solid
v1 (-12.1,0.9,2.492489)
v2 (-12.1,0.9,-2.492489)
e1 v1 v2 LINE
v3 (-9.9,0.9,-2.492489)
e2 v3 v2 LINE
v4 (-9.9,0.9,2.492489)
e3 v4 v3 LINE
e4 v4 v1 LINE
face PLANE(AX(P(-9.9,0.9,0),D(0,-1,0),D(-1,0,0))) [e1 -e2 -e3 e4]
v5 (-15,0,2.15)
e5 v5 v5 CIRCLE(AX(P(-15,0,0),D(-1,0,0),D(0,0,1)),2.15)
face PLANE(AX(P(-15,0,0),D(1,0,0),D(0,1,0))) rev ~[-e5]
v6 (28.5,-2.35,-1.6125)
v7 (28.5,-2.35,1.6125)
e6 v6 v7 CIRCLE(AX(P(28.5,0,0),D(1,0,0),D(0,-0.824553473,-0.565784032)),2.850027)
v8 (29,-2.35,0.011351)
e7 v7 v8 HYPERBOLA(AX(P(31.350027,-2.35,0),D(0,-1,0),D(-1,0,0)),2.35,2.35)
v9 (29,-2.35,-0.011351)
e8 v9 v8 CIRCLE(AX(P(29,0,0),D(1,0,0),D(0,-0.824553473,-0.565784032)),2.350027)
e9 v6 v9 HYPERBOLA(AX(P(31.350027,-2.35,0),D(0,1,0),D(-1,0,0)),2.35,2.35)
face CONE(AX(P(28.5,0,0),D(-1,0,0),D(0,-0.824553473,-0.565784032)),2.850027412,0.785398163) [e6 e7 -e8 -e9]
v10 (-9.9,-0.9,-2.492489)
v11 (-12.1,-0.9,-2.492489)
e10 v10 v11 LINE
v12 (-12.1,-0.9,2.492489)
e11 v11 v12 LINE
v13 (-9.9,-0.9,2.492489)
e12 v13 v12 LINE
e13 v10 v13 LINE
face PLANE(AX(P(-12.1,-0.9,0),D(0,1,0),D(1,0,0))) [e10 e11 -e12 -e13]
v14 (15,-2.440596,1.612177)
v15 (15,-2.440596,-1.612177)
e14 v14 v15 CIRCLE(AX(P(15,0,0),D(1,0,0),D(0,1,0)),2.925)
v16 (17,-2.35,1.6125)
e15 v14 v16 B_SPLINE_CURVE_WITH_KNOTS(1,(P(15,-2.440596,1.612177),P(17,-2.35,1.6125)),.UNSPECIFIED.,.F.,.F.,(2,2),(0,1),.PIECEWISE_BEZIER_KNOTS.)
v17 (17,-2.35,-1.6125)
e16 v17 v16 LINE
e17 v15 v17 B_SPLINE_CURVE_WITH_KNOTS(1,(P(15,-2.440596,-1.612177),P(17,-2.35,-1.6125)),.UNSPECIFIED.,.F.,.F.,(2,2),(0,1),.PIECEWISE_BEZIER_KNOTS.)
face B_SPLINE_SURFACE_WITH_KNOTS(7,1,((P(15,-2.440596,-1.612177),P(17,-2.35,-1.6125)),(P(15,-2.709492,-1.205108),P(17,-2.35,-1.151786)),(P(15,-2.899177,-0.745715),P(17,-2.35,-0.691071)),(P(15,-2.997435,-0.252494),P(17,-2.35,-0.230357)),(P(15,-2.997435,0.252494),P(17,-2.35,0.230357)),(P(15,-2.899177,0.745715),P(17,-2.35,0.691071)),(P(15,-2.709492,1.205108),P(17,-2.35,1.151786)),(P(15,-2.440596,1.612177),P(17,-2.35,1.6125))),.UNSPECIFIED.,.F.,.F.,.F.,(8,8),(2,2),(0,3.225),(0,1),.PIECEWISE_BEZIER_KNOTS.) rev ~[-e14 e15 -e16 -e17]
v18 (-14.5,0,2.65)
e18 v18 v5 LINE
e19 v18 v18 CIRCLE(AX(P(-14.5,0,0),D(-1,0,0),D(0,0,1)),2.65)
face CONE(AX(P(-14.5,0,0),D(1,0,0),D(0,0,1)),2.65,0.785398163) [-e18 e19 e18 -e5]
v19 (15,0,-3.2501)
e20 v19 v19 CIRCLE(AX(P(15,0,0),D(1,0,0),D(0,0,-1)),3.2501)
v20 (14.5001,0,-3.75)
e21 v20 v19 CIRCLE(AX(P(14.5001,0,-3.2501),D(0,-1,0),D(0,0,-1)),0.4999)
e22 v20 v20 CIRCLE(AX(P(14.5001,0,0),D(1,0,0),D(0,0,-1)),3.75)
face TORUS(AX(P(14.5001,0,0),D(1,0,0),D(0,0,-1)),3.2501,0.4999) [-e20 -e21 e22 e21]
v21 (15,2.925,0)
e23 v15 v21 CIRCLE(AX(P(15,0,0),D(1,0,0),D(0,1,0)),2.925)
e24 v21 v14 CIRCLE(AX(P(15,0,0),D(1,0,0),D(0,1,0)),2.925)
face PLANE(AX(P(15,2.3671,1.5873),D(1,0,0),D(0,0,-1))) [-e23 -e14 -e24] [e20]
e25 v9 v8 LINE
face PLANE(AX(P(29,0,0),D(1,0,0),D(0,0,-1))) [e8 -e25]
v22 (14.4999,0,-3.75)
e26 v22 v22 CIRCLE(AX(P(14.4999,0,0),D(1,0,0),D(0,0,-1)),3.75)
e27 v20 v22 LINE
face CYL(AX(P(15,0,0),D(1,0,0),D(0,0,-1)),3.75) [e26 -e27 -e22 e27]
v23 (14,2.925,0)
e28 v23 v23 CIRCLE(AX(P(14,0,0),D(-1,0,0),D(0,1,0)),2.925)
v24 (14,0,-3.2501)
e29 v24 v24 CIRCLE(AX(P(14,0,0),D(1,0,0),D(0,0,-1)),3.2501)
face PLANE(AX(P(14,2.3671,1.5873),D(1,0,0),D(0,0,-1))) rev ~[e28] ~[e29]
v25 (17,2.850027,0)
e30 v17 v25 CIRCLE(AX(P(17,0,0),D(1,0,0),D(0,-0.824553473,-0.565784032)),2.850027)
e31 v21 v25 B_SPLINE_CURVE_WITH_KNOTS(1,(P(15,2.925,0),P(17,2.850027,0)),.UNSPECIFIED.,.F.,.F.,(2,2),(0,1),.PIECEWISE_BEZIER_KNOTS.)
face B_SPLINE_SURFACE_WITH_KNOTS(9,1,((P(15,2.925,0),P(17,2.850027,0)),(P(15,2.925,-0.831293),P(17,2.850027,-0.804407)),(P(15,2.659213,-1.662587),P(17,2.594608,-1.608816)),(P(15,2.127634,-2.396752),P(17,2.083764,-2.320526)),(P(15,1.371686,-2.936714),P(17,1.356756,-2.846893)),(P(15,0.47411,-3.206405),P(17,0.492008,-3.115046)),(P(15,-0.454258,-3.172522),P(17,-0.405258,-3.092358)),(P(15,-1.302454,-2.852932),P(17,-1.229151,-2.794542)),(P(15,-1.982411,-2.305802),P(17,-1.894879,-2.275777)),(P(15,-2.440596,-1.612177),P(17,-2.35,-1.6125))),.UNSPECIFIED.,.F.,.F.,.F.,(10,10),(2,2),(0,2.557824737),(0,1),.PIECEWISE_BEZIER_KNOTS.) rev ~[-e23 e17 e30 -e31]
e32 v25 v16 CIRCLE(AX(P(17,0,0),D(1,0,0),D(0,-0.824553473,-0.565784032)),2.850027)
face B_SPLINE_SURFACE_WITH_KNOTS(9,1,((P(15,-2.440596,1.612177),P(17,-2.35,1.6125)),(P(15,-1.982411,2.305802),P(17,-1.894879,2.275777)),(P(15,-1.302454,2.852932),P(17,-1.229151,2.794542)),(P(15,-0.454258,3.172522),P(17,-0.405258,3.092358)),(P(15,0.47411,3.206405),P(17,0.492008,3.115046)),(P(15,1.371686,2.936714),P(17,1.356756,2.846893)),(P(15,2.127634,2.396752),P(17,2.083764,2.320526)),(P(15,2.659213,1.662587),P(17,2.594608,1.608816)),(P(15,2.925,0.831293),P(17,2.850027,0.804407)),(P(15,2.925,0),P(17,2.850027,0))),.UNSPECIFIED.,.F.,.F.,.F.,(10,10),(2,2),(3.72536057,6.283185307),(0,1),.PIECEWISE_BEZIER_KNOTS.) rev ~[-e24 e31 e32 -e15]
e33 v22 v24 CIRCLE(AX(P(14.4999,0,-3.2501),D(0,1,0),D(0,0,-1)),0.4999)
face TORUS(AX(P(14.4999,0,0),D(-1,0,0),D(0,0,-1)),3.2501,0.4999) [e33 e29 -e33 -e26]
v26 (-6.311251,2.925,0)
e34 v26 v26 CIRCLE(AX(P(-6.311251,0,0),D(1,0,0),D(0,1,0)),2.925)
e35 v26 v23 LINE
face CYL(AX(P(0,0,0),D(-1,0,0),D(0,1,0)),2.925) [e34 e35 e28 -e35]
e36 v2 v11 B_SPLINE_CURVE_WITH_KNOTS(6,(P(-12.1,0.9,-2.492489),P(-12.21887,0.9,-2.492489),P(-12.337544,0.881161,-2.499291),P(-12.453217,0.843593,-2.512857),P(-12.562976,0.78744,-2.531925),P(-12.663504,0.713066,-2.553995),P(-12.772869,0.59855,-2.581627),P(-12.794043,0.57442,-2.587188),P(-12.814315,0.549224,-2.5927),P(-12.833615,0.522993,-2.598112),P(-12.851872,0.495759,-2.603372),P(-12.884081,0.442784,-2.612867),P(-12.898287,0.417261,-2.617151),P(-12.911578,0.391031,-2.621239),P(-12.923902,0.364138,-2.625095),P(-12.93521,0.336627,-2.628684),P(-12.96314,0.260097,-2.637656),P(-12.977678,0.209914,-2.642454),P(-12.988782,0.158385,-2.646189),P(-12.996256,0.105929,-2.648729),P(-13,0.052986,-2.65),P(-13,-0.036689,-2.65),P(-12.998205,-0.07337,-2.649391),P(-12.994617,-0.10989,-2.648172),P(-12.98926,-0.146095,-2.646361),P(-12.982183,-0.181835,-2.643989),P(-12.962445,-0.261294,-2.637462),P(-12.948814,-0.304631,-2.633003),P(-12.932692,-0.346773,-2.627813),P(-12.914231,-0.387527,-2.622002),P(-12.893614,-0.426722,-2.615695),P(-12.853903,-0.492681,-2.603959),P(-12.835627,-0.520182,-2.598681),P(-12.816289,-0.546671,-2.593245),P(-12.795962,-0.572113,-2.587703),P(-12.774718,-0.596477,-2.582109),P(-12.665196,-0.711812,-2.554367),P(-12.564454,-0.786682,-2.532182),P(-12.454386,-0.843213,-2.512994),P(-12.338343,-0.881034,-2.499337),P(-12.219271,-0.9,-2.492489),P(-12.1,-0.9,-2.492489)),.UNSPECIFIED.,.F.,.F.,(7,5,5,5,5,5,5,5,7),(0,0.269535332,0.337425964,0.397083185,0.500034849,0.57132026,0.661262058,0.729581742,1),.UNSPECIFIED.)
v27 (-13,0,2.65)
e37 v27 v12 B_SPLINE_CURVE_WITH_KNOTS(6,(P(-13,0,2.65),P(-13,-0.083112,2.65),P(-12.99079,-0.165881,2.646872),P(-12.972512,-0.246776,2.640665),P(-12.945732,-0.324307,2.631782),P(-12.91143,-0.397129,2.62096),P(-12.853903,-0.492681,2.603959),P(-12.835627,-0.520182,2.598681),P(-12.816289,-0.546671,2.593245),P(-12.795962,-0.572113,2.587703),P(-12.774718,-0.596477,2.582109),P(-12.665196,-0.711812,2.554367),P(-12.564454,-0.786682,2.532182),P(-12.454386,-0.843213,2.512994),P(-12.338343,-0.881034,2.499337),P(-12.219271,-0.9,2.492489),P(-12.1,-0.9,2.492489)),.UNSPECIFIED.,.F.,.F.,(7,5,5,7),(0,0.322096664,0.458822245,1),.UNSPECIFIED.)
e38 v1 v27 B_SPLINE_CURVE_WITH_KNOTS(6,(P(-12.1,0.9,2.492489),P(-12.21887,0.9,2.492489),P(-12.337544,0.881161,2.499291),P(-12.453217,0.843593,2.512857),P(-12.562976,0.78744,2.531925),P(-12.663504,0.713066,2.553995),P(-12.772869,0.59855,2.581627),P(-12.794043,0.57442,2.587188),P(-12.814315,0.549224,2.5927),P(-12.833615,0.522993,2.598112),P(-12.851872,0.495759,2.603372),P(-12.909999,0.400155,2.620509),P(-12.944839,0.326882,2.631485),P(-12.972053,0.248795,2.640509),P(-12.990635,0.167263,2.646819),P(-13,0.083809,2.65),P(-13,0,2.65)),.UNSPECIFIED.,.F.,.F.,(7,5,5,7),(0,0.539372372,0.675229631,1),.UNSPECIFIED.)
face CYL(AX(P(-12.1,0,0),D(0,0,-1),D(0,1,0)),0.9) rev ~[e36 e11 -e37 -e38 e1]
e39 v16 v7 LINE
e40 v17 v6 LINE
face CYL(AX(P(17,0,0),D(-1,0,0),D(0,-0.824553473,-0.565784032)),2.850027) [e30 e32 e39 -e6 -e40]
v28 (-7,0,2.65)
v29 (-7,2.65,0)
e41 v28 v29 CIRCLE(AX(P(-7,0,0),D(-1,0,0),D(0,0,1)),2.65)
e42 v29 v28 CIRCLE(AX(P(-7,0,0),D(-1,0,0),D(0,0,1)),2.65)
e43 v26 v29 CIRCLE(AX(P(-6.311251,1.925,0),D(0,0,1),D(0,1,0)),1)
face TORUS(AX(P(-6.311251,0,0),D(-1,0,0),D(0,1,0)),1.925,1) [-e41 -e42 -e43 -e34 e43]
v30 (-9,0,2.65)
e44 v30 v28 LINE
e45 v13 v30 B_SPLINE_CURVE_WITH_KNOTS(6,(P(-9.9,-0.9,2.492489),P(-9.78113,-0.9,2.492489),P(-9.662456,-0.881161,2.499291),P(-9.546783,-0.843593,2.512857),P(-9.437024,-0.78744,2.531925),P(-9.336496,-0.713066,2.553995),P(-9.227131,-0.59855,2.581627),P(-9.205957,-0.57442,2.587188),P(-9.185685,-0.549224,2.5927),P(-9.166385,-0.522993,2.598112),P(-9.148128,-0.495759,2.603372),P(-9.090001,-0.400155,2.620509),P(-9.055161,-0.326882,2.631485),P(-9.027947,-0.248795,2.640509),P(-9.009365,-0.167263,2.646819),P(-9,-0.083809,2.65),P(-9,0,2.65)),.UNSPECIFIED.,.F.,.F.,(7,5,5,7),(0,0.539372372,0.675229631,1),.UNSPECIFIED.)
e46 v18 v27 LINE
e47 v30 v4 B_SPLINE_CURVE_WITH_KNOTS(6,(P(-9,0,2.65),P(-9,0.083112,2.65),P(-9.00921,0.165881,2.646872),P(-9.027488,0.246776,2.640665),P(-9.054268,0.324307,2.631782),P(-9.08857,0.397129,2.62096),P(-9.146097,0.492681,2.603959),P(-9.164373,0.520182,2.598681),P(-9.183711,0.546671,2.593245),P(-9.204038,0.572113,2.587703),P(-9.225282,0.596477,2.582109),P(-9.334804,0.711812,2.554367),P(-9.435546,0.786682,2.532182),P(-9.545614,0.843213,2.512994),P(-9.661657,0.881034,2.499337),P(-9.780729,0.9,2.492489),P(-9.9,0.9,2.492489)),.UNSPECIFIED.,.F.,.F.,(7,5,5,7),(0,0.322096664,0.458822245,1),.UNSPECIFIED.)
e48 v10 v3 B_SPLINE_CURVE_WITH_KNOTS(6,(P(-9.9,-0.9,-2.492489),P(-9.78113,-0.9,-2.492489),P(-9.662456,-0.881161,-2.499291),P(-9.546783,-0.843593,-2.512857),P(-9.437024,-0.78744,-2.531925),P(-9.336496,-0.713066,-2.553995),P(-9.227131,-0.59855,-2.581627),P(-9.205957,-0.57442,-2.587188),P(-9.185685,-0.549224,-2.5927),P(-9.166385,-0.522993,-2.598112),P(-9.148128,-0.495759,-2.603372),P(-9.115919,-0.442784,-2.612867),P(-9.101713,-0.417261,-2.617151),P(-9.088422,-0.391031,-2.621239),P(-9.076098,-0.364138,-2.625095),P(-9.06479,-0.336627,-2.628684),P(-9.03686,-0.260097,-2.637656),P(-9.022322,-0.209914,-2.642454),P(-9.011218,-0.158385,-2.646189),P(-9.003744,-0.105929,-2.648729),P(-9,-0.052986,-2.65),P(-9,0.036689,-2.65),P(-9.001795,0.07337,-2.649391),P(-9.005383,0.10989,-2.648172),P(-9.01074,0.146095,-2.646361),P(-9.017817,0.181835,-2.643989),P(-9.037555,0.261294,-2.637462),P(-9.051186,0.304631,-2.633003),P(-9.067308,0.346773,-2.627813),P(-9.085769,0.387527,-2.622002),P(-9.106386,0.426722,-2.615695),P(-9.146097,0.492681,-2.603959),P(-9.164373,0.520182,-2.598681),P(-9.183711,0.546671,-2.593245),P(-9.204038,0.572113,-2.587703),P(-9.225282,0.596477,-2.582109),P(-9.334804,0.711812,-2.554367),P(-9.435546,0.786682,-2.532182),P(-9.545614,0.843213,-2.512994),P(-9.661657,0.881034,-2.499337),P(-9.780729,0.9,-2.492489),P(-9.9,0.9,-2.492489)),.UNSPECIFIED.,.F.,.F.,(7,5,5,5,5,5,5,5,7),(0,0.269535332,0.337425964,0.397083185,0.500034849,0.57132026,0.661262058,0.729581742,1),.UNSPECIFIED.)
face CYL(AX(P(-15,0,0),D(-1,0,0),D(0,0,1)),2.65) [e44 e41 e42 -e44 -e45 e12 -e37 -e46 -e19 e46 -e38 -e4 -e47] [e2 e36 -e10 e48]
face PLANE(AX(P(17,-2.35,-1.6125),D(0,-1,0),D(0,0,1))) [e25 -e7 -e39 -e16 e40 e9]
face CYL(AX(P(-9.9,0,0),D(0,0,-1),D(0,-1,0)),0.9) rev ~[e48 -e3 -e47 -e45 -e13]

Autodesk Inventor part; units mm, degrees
ref_plane "YZ Plane" through (0, 0, 0) normal (1, 0, 0) x (0, 1, 0)
ref_plane "XZ Plane" through (0, 0, 0) normal (0, 1, 0) x (-1, 0, 0)
sketch "Sketch1" plane through (0, 0, 0) normal (1, 0, 0) x (0, 1, 0)
  circle A0 centre (0, 0) radius 2.925
  dimension "diameter" = 5.85
extrude "Shaft" add sketch "Sketch1" along normal mid plane 30
sketch "Sketch2" plane through (0, 0, 0) normal (0, 0, 1) x (1, 0, 0)
  line L0 (-15, -2.925) -> (-15, 2.925) construction
  line L1 (15, -2.925) -> (-15, -2.925) construction
  line L2 (15, 2.925) -> (15, -2.925) construction
  line L3 (-15, 2.925) -> (15, 2.925) construction
  line L4 (-15, -2.925) -> (15, -2.925) projected
  line L5 (-8, -2.925) -> (-8, -2.925)
  line L6 (-15, -2.925) -> (15, -2.925) projected
  line L7 (-13, 0) -> (-9, 0) construction
  line L8 (-12.1, -0.9) -> (-9.9, -0.9)
  line L9 (-9.9, 0.9) -> (-12.1, 0.9)
  arc A0 (-12.1, 0.9) -> (-12.1, -0.9) centre (-12.1, 0) ccw
  arc A1 (-9.9, -0.9) -> (-9.9, 0.9) centre (-9.9, 0) ccw
  point P0 (0, 0)
  point P1 (15, 0)
  point P2 (-11, 0)
  dimension "d17" = 1.8
  dimension "d20" = 2
  dimension "d21" = 1
  dimension "d22" = 7
extrude "Slot for Differential Gear" cut sketch "Sketch2" along normal through all both and the other way through all
ref_plane "Work Plane1" through (17, 0, 0) normal (1, 0, 0) x (0, 0, -1)
sketch "Sketch3" plane through (17, 0, 0) normal (1, 0, 0) x (0, 0, -1)
  arc A0 (1.6583, -2.5) -> (-1.6583, -2.5) centre (0, 0) ccw construction
  circle A1 centre (0, 0) radius 2.925 construction
  line L0 (-1.6583, -2.5) -> (1.6583, -2.5)
  arc A2 (1.6125, -2.35) -> (-1.6125, -2.35) centre (0, 0) ccw
  line L1 (1.6125, -2.35) -> (-1.6125, -2.35)
  point P0 (-1.5184, -2.5)
  point P1 (1.5184, -2.5)
  dimension "d49" = 3
  dimension "d50" = 2.5
  dimension "wheel_offset" = 0.15
extrude "Wheel Insert Profile" add sketch "Sketch3" along normal blind 12
loft "Loft1" add section 1 edges at (15, -2.925, 0) section 2 edges at (17, -2.35, 0) (17, 2.85, 0)
ref_plane "Work Plane2" through (15, 2.3671, 1.5873) normal (1, 0, 0) x (0, 0, -1)
sketch "Sketch4" plane through (15, 2.3671, 1.5873) normal (1, 0, 0) x (0, 0, -1)
  circle A0 centre (1.5873, -2.3671) radius 3.75
  dimension "d35" = 7.5
extrude "Stopper" add sketch "Sketch4" against normal blind 1
fillet "Fillet1" radius 0.5 2 edges at (15, 0, 3.75) (14, 0, 3.75)
sketch "Sketch8" plane through (-15, 0, 0) normal (-1, 0, 0) x (0, 0, 1)
  circle A0 centre (0, 0) radius 2.925 projected
  circle A1 centre (0, 0) radius 2.7 construction
  circle A2 centre (0, 0) radius 2.65
  dimension "d68" = 5.4
  dimension "d69" = 0.05
extrude "Differential Gear Insert Profile" cut sketch "Sketch8" against normal blind 8
fillet "Fillet3" radius 1 1 edges at (-7, -2.925, 0)
chamfer "Chamfer4" distance 0.5 angle 45 2 edges at (-15, 0, -2.65) (29, 2.85, 0)
properties part number "rear shaft v2"
